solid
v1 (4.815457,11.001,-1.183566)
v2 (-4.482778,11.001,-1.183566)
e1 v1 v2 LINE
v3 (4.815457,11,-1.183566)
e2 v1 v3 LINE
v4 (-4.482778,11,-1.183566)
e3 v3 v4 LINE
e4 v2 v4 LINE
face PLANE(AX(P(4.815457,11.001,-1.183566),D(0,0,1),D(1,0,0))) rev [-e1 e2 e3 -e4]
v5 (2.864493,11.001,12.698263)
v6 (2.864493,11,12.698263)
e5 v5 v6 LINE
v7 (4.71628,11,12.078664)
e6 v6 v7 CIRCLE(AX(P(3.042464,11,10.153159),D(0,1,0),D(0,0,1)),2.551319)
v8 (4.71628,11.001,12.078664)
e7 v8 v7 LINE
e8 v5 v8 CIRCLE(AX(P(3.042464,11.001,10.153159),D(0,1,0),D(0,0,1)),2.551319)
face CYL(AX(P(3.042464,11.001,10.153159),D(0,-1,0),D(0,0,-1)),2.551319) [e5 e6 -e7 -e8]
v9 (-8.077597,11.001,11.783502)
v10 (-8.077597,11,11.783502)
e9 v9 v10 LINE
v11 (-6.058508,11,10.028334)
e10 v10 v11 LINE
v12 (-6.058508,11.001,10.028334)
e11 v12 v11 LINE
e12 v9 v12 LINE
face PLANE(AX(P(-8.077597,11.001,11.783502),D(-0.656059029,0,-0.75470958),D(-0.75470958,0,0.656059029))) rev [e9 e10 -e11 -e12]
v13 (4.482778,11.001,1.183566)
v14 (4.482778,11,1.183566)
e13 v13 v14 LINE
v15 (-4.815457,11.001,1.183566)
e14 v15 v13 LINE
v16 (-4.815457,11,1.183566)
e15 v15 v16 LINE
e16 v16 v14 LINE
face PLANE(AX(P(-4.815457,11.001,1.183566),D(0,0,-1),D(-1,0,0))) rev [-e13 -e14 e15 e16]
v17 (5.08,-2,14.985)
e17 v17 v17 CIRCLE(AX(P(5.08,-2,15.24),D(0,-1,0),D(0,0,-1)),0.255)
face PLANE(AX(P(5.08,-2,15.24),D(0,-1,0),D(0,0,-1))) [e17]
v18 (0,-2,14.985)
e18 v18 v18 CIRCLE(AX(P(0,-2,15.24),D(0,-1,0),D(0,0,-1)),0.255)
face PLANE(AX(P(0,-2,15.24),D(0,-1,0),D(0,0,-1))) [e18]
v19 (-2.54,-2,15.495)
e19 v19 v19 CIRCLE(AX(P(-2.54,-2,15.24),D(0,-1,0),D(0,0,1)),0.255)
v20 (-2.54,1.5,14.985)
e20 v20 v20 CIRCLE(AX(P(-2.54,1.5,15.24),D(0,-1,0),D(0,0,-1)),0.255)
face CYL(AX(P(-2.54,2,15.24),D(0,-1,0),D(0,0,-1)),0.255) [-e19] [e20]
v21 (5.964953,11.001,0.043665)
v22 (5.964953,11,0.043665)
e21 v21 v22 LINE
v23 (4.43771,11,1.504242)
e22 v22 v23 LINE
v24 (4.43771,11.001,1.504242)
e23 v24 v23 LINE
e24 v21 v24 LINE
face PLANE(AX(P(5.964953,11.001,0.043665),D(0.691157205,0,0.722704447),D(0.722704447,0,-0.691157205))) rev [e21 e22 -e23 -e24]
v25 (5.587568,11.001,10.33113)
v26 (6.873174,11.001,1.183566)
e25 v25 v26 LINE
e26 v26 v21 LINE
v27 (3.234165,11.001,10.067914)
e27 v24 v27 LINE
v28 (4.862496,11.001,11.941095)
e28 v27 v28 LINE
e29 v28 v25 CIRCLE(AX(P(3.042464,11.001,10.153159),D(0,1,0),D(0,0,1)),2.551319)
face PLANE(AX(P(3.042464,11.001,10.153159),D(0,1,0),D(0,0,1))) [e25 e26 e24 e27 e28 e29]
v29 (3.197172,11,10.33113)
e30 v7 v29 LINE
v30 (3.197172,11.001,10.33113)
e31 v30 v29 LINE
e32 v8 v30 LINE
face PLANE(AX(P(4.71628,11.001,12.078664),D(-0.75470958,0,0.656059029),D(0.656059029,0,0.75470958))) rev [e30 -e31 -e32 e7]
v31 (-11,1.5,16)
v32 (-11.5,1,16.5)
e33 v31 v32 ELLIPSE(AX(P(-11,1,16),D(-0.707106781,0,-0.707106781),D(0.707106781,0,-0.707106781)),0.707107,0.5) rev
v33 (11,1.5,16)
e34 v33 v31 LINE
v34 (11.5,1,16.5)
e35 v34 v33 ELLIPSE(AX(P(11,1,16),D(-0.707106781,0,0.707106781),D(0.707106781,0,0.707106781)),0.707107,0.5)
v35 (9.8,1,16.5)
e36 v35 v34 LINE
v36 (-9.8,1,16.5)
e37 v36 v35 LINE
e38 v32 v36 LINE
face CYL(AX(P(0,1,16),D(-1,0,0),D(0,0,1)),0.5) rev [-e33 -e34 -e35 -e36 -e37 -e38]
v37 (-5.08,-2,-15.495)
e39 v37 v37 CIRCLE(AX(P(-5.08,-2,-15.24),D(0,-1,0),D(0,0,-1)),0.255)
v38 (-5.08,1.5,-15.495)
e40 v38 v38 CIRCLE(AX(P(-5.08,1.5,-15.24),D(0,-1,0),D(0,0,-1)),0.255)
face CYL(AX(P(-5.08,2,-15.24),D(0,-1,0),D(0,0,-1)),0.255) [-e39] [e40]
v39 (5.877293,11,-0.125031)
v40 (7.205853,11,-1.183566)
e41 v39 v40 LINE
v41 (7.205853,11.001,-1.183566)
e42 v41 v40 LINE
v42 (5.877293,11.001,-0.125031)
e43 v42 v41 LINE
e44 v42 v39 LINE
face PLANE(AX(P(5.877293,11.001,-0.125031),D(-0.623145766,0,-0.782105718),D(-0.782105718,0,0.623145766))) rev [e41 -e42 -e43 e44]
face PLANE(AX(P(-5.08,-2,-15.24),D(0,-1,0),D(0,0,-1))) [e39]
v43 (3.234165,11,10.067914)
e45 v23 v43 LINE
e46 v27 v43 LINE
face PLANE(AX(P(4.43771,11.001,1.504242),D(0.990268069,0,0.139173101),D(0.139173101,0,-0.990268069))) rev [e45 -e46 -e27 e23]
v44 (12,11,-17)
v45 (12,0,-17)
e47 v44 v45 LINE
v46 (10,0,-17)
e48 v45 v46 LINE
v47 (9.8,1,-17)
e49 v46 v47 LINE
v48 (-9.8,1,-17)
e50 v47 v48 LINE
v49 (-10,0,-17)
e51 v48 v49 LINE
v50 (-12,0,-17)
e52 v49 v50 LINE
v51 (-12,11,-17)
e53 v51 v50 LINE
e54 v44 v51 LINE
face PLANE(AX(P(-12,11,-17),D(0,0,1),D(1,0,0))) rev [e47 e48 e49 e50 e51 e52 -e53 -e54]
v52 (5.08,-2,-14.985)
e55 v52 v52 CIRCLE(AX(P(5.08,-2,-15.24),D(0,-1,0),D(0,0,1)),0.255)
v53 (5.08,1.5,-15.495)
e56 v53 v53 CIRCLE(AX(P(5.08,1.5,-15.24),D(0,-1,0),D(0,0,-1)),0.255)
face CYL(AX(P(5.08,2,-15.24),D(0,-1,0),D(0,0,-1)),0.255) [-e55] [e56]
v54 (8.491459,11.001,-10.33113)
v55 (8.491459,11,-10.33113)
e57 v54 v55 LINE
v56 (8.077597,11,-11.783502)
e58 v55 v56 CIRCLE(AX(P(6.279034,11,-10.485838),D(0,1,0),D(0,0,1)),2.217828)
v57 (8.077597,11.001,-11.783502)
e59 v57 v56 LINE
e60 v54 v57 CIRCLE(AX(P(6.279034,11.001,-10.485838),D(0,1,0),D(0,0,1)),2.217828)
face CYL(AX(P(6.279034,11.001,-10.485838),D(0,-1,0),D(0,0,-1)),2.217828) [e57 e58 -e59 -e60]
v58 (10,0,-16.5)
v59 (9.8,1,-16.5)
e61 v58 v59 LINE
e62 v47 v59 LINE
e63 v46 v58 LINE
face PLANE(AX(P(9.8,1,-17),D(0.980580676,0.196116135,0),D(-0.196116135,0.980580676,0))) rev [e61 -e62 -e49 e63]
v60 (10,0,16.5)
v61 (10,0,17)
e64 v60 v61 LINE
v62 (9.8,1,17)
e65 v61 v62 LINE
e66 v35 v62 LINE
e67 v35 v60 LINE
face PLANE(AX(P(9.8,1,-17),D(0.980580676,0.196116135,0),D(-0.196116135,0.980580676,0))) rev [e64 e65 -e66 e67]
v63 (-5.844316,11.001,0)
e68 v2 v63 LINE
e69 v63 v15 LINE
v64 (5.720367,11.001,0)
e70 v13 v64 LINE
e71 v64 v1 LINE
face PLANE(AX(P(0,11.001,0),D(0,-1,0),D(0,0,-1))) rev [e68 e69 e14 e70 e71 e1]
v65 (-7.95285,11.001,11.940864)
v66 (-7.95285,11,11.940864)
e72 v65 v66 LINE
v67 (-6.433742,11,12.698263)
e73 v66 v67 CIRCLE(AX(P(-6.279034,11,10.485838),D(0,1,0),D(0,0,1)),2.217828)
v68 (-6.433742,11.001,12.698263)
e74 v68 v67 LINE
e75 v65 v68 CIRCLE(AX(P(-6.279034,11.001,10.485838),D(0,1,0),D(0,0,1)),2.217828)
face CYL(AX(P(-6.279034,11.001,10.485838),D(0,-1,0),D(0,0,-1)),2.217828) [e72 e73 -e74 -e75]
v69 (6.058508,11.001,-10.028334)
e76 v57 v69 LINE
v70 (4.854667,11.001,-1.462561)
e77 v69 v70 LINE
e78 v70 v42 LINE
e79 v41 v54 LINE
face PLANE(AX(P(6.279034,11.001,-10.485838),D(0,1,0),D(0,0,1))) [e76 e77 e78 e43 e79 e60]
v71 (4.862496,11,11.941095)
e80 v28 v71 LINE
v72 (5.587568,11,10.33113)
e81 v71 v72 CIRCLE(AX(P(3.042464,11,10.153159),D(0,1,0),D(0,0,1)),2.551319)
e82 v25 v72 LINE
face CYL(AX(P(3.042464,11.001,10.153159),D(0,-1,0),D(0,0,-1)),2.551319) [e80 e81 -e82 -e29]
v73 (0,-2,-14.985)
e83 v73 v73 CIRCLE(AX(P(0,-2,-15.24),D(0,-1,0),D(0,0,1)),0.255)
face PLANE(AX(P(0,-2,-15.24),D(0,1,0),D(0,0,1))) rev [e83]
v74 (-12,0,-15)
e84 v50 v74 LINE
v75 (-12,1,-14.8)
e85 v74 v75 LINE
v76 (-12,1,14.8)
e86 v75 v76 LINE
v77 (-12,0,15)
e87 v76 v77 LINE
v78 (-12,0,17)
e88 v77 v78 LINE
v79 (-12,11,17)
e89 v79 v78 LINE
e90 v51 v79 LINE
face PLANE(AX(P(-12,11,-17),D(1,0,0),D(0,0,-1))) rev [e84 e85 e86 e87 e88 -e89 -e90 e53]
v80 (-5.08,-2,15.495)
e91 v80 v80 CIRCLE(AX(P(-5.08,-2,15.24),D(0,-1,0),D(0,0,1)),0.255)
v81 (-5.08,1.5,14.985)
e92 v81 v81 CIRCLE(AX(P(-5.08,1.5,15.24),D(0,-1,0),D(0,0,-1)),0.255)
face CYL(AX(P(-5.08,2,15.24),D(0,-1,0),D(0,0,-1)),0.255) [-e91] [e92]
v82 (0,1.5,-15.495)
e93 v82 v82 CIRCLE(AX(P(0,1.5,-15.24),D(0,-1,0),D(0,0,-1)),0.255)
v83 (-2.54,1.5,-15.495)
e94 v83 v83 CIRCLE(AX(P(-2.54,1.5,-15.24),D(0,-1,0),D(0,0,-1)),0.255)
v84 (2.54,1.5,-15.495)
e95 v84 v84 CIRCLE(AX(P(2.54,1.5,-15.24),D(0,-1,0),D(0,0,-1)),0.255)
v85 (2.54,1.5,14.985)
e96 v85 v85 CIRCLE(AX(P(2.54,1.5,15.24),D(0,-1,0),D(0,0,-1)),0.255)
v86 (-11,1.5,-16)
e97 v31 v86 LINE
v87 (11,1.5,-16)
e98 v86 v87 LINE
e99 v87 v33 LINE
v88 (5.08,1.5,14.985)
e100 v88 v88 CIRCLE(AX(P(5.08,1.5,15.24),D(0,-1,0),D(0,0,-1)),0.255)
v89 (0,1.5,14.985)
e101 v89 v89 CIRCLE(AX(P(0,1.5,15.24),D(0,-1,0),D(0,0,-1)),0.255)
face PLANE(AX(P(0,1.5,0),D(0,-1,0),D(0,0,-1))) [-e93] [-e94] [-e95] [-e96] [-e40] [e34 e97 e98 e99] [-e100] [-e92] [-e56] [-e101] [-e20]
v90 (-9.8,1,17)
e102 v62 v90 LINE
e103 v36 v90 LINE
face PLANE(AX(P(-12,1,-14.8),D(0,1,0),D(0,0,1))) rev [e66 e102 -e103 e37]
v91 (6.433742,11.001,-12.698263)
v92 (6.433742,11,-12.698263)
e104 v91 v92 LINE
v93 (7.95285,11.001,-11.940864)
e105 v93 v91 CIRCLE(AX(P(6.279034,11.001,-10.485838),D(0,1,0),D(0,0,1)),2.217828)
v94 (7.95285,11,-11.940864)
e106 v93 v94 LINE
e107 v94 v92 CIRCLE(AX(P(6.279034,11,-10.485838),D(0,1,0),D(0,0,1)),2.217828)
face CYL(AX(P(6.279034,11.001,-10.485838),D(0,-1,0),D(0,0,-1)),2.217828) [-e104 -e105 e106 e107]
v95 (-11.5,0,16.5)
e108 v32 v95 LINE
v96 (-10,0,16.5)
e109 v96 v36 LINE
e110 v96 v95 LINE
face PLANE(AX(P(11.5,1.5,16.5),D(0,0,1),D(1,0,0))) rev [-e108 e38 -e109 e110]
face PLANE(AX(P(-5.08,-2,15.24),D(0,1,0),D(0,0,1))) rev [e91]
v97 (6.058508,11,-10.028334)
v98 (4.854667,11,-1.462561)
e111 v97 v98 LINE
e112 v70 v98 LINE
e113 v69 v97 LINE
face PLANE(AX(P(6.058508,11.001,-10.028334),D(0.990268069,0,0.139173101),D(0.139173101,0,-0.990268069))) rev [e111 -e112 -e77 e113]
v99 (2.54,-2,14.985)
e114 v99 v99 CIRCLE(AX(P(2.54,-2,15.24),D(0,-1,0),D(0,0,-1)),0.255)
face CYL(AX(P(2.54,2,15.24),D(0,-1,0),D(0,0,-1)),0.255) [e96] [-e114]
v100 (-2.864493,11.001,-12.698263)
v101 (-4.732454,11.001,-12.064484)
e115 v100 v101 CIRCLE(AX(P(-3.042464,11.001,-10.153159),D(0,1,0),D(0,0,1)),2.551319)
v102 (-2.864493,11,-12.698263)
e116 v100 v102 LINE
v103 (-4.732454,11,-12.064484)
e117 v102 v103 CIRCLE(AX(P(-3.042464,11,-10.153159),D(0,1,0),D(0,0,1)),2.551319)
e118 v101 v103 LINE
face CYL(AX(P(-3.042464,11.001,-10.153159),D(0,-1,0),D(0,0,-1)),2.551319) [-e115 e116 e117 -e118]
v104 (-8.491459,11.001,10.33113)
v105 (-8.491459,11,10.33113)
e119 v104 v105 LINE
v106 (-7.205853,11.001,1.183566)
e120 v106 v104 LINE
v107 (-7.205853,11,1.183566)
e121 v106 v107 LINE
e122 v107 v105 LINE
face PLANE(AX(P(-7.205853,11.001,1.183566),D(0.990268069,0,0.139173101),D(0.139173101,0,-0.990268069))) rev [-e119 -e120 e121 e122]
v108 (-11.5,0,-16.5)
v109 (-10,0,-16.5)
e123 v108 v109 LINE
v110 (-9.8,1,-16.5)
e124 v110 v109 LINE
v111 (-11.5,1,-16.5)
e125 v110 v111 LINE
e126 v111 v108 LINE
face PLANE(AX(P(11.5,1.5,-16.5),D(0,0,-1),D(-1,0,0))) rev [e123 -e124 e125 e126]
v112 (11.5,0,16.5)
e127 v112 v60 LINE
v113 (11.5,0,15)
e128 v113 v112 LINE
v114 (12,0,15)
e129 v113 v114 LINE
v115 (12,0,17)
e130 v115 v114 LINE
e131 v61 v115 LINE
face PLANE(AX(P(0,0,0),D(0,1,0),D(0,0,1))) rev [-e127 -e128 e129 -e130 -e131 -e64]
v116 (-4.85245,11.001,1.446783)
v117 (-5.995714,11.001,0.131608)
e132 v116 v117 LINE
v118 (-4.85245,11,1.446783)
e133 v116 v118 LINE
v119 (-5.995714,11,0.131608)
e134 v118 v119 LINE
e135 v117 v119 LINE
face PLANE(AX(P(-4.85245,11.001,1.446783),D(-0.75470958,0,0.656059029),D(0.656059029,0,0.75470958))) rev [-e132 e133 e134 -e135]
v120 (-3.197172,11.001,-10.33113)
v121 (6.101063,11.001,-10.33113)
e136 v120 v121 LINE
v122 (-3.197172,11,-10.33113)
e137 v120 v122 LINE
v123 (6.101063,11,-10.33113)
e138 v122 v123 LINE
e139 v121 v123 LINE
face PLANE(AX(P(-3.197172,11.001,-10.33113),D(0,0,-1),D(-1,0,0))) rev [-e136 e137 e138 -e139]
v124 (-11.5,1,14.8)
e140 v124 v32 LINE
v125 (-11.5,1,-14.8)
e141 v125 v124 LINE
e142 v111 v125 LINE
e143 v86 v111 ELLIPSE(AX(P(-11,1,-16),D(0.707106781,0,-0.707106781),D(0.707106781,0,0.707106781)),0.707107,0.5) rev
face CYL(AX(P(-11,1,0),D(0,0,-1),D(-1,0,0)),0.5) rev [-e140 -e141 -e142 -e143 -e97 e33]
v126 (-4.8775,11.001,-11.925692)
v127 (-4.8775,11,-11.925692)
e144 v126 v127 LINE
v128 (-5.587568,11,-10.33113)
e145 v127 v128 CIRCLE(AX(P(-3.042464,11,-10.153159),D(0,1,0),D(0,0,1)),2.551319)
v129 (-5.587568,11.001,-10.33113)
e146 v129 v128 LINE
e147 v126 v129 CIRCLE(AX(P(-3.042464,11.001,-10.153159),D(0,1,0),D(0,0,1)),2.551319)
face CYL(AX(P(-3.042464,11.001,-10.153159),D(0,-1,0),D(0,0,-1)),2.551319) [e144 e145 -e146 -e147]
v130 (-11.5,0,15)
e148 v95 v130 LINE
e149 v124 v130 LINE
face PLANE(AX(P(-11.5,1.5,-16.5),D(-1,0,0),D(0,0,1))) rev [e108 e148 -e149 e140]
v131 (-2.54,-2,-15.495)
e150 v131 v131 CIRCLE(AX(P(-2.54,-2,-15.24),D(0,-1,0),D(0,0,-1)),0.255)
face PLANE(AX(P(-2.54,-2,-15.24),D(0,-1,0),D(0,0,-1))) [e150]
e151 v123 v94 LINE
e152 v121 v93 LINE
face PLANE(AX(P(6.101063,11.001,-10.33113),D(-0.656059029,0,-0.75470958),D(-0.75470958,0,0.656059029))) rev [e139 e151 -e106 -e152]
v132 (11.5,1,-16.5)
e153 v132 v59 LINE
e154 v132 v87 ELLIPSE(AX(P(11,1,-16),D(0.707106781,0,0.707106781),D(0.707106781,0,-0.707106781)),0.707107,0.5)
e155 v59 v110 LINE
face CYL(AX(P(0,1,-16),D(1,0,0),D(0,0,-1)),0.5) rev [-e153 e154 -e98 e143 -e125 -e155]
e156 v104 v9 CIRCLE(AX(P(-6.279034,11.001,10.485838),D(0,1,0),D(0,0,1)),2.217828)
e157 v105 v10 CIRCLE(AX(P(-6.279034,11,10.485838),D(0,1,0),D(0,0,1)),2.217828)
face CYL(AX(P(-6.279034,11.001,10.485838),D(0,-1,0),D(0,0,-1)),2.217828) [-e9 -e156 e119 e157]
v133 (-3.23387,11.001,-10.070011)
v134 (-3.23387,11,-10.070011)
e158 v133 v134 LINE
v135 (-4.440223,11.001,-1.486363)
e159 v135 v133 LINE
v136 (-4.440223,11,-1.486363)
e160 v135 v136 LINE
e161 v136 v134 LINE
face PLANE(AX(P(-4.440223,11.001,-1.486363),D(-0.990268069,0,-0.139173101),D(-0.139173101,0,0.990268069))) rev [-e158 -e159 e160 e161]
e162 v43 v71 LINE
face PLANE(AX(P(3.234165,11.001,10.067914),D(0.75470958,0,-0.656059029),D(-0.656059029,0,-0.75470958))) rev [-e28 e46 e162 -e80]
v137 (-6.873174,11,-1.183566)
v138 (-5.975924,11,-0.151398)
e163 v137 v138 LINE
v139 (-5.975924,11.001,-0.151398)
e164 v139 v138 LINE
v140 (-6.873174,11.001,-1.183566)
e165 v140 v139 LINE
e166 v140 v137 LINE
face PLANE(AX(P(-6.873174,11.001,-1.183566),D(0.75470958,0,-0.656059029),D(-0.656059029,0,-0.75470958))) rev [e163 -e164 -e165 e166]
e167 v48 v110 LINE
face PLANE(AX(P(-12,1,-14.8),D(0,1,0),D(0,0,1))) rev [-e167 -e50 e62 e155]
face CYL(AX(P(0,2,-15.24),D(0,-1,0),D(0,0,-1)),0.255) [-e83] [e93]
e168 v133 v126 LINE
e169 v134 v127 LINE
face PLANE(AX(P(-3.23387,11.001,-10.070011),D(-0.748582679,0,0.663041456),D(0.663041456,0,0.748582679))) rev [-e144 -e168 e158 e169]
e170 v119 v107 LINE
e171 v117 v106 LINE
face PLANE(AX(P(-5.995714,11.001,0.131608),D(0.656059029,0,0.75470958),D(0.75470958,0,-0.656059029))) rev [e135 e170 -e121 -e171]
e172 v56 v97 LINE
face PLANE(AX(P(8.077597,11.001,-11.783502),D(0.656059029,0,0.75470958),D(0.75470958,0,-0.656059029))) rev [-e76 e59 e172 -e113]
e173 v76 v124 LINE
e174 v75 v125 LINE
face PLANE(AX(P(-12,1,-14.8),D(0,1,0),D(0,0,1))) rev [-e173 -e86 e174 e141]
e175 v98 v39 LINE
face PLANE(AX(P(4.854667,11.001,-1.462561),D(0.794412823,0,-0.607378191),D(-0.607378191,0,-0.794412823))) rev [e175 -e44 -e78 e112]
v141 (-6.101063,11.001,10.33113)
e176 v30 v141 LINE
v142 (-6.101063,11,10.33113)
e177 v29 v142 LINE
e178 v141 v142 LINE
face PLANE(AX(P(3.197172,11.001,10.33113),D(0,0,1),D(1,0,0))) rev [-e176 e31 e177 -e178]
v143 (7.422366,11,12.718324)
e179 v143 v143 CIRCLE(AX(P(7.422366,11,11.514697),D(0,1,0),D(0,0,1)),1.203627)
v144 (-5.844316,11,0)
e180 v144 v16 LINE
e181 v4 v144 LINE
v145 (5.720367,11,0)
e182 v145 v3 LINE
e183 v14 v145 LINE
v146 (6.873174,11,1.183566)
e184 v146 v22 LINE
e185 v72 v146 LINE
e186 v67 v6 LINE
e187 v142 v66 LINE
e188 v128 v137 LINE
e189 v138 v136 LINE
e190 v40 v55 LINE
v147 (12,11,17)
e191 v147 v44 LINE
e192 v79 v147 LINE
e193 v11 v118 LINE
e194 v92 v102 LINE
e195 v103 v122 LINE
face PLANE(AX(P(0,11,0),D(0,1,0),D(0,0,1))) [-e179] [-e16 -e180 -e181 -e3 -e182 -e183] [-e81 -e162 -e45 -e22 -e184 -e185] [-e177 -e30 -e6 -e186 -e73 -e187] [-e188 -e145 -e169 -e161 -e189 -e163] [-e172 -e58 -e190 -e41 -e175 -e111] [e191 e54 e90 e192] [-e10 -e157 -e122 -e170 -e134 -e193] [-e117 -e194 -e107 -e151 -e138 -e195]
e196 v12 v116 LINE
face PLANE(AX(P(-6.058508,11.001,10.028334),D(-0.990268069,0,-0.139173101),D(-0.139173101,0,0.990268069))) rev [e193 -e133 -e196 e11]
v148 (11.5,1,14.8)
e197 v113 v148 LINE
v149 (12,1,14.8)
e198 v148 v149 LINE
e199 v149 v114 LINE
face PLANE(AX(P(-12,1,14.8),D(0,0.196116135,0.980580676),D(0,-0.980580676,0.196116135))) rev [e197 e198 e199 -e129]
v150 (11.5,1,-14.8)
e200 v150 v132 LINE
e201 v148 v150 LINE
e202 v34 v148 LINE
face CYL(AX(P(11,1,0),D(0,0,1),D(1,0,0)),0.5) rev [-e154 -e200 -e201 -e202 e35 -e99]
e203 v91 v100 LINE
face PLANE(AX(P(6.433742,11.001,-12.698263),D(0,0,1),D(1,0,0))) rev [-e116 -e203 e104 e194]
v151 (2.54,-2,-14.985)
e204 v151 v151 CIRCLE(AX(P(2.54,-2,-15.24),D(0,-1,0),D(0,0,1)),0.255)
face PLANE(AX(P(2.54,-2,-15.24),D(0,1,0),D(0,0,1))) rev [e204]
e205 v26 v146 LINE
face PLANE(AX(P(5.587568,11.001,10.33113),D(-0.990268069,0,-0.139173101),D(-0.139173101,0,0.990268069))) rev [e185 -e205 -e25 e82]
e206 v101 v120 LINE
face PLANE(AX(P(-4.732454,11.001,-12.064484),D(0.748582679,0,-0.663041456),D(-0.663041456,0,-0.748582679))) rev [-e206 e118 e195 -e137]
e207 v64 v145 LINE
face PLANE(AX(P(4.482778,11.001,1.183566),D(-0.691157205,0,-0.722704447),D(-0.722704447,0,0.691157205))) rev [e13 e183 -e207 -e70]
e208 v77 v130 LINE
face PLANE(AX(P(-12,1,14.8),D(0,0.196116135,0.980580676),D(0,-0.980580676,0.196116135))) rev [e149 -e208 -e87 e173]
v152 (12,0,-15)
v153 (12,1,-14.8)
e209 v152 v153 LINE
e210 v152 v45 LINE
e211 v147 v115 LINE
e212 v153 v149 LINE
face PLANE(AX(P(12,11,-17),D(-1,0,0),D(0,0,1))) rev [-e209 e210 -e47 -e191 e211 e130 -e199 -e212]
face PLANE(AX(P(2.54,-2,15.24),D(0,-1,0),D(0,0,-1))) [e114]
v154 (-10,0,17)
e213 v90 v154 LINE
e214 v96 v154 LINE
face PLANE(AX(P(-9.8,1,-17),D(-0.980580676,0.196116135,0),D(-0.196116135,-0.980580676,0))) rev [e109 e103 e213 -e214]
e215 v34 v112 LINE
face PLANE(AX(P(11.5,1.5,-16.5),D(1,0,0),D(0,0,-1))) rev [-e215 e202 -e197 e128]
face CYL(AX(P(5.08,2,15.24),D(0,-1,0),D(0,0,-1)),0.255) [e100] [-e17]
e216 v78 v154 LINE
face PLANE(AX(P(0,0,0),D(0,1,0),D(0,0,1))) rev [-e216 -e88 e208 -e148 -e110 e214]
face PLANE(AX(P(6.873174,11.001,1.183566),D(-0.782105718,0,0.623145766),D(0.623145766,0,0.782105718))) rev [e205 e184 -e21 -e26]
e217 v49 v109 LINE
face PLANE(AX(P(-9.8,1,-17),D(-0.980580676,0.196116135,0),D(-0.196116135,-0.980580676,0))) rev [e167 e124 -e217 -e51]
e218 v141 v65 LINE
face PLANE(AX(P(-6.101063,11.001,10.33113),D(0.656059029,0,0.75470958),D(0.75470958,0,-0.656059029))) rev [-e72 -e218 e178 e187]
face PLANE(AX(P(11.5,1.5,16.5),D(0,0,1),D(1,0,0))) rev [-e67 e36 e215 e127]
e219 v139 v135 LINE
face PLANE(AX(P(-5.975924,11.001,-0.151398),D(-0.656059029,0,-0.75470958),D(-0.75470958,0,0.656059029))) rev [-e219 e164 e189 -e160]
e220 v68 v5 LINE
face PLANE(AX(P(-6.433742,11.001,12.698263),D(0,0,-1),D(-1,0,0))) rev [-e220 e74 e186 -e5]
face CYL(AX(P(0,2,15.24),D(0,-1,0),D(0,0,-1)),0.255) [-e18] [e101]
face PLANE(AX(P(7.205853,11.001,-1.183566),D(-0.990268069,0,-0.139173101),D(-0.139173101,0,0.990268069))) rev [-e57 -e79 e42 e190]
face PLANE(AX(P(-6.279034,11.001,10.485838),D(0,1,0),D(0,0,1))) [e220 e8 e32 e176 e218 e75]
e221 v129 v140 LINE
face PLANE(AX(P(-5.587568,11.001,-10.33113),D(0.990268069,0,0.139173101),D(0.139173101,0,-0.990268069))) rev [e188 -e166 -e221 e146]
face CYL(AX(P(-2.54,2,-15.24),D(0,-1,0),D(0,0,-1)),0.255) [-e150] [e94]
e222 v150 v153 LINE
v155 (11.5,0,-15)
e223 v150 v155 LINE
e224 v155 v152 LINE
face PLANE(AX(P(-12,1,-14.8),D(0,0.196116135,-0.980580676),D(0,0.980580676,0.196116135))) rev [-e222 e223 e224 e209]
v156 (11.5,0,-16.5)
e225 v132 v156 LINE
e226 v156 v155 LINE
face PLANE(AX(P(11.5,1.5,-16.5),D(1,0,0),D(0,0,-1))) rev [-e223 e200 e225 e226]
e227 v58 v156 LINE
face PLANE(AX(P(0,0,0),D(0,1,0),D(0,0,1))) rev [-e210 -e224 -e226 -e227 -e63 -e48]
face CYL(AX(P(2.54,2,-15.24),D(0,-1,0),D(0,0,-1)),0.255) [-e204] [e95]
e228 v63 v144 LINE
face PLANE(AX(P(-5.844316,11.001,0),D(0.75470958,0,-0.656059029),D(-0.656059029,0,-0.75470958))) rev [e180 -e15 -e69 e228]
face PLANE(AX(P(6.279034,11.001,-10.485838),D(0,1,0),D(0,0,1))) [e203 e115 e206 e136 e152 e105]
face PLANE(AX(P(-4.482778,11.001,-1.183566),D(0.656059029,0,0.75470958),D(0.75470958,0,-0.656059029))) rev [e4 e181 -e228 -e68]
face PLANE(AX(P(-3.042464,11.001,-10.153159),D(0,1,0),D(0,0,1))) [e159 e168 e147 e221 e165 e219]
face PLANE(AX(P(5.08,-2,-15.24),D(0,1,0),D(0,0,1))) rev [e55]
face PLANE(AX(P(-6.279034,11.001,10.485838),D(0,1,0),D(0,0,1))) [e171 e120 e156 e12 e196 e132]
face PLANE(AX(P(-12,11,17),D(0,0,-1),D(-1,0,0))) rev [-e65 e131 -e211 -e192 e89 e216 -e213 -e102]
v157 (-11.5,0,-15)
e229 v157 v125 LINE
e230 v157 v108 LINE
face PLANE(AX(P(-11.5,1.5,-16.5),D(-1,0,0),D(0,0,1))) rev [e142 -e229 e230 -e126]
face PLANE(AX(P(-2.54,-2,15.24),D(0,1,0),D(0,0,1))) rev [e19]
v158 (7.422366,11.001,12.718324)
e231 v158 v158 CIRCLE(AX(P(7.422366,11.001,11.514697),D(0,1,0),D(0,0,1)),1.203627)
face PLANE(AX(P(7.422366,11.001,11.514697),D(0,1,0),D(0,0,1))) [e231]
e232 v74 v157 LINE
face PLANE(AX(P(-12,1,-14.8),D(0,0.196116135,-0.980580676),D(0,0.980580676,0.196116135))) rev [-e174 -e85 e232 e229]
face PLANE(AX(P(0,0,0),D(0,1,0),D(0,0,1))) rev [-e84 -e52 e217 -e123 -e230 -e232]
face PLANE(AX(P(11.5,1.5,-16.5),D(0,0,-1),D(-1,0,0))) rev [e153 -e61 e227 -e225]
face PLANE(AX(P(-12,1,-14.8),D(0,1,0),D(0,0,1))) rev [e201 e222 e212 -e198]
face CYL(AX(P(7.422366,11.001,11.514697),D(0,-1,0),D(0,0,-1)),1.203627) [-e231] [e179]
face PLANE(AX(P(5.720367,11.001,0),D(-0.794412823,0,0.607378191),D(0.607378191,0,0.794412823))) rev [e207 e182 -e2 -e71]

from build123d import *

# Parameters (mm, degrees)
SKETCH1_W                = 24
SKETCH1_H                = 34
BOSS_EXTRUDE1_DEPTH      = 11
CUT_EXTRUDE1_DEPTH       = 32.400636936
CUT_EXTRUDE2_DEPTH       = 38.69615365
SKETCH5_W                = 23
SKETCH5_H                = 33
CUT_EXTRUDE3_DEPTH       = 1.5
FILLET1_START            = -11.5
FILLET1_DEPTH            = 23
FILLET1_START_2          = -17
FILLET1_2_DEPTH          = 34
BOSS_EXTRUDE3_DEPTH      = 2
BOSS_EXTRUDE3_DEPTH_BACK = 2
SKETCH6_R                = 0.255
SKETCH8_R                = 1.203626853
BOSS_EXTRUDE4_DEPTH      = 0.001


with BuildPart() as part:
    # Sketch1 → Boss-Extrude1 (new body)
    with BuildSketch(Plane(origin=(0, 0, 0), x_dir=(1, 0, 0), z_dir=(0, 1, 0))):
        Rectangle(SKETCH1_W, SKETCH1_H)
    extrude(amount=BOSS_EXTRUDE1_DEPTH)

    # Sketch2 → Cut-Extrude1 (cut, through all)
    with BuildSketch(Plane(origin=(12, 0, 0), x_dir=(0, 0, -1), z_dir=(1, 0, 0))):
        Polygon((14.8, 1), (-14.8, 1), (-15, 0), (-15, -1), (15, -1), (15, 0), align=None)
    extrude(amount=-CUT_EXTRUDE1_DEPTH, mode=Mode.SUBTRACT)

    # Sketch3 → Cut-Extrude2 (cut, through all)
    with BuildSketch(Plane.XY.offset(17)):
        Polygon((9.8, 1), (-9.8, 1), (-10, 0), (-10, -1), (10, -1), (10, 0), align=None)
    extrude(amount=-CUT_EXTRUDE2_DEPTH, mode=Mode.SUBTRACT)

    # Sketch5 → Cut-Extrude3 (cut)
    with BuildSketch(Plane.XZ):
        Rectangle(SKETCH5_W, SKETCH5_H)
    extrude(amount=-CUT_EXTRUDE3_DEPTH, mode=Mode.SUBTRACT)

    # Fillet1: read off the stored shape, not the designer's step
    # Fillet1 outline → Fillet1 (add)
    with BuildSketch(Plane.YZ.offset(FILLET1_START)):
        with BuildLine():
            Line((1.5, 16.5), (1, 16.5))
            ThreePointArc((1, 16.5), (1.353553391, 16.353553391), (1.5, 16))
            Line((1.5, 16), (1.5, 16.5))
        make_face()
        with BuildLine():
            Line((1.5, -16.5), (1.5, -16))
            ThreePointArc((1.5, -16), (1.353553391, -16.353553391), (1, -16.5))
            Line((1, -16.5), (1.5, -16.5))
        make_face()
    extrude(amount=FILLET1_DEPTH)

    # Fillet1 2 outline → Fillet1 2 (add)
    with BuildSketch(Plane.XY.offset(FILLET1_START_2)):
        with BuildLine():
            Line((-11.5, 1.5), (-11.5, 1))
            ThreePointArc((-11.5, 1), (-11.353553391, 1.353553391), (-11, 1.5))
            Line((-11, 1.5), (-11.5, 1.5))
        make_face()
        with BuildLine():
            Line((11.5, 1.5), (11, 1.5))
            ThreePointArc((11, 1.5), (11.353553391, 1.353553391), (11.5, 1))
            Line((11.5, 1), (11.5, 1.5))
        make_face()
    extrude(amount=FILLET1_2_DEPTH)

    # Sketch6 → Boss-Extrude3 (add, two sides: drawn at the far end of the back side and taken through both)
    with BuildSketch(Plane.XZ.offset(-BOSS_EXTRUDE3_DEPTH_BACK)):
        with Locations(Location((0, 15.24, 0), (0, 0, 270))):
            Circle(SKETCH6_R)
        with Locations(Location((2.54, 15.24, 0), (0, 0, 270))):
            Circle(SKETCH6_R)
        with Locations(Location((5.08, 15.24, 0), (0, 0, 270))):
            Circle(SKETCH6_R)
        with Locations(Location((-5.08, 15.24, 0), (0, 0, 270))):
            Circle(SKETCH6_R)
        with Locations(Location((-2.54, 15.24, 0), (0, 0, 270))):
            Circle(SKETCH6_R)
        with Locations(Location((-2.54, -15.24, 0), (0, 0, 270))):
            Circle(SKETCH6_R)
        with Locations(Location((-5.08, -15.24, 0), (0, 0, 270))):
            Circle(SKETCH6_R)
        with Locations(Location((5.08, -15.24, 0), (0, 0, 270))):
            Circle(SKETCH6_R)
        with Locations(Location((2.54, -15.24, 0), (0, 0, 270))):
            Circle(SKETCH6_R)
        with Locations(Location((0, -15.24, 0), (0, 0, 270))):
            Circle(SKETCH6_R)
    extrude(amount=BOSS_EXTRUDE3_DEPTH + BOSS_EXTRUDE3_DEPTH_BACK)

    # Sketch8 → Boss-Extrude4 (add)
    with BuildSketch(Plane(origin=(0, 11, 0), x_dir=(1, 0, 0), z_dir=(0, 1, 0))):
        with Locations(Location((7.422365596, -11.514696897, 0), (0, 0, 270))):
            Circle(SKETCH8_R)
        with BuildLine():
            Line((4.437710207, -1.50424181), (3.234164607, -10.067913736))
            Line((3.234164607, -10.067913736), (4.862495803, -11.941094501))
            ThreePointArc((4.862495803, -11.941094501), (5.368748257, -11.200837396), (5.587567885, -10.331130491))
            Line((5.587567885, -10.331130491), (6.873174177, -1.183566406))
            Line((6.873174177, -1.183566406), (5.964953485, -0.043665222))
            Line((5.964953485, -0.043665222), (4.437710207, -1.50424181))
        make_face()
        with BuildLine():
            Line((5.877292712, 0.125030841), (7.205852999, 1.183566406))
            Line((7.205852999, 1.183566406), (8.491459291, 10.331130491))
            ThreePointArc((8.491459291, 10.331130491), (8.411955198, 11.093627172), (8.077597236, 11.783501683))
            Line((8.077597236, 11.783501683), (6.058508073, 10.028334252))
            Line((6.058508073, 10.028334252), (4.854667192, 1.462561294))
            Line((4.854667192, 1.462561294), (5.877292712, 0.125030841))
        make_face()
        with BuildLine():
            Line((6.10106331, 10.331130491), (7.952849968, 11.940864075))
            ThreePointArc((7.952849968, 11.940864075), (7.268624086, 12.470648357), (6.433742131, 12.698263303))
            Line((6.433742131, 12.698263303), (-2.864493083, 12.698263303))
            ThreePointArc((-2.864493083, 12.698263303), (-3.862201278, 12.569201297), (-4.732453708, 12.064484197))
            Line((-4.732453708, 12.064484197), (-3.197171904, 10.331130491))
            Line((-3.197171904, 10.331130491), (6.10106331, 10.331130491))
        make_face()
        Polygon((-4.815457018, -1.183566406), (4.482778196, -1.183566406), (5.720367413, 0), (4.815457018, 1.183566406), (-4.482778196, 1.183566406), (-5.844315597, 0), align=None)
        with BuildLine():
            Line((-5.975923975, 0.15139812), (-4.44022296, 1.486362645))
            Line((-4.44022296, 1.486362645), (-3.233869851, 10.07001103))
            Line((-3.233869851, 10.07001103), (-4.877500084, 11.925691561))
            ThreePointArc((-4.877500084, 11.925691561), (-5.373142616, 11.19102491), (-5.587567885, 10.331130491))
            Line((-5.587567885, 10.331130491), (-6.873174177, 1.183566406))
            Line((-6.873174177, 1.183566406), (-5.975923975, 0.15139812))
        make_face()
        with BuildLine():
            Line((-5.995713717, -0.131608377), (-7.205852999, -1.183566406))
            Line((-7.205852999, -1.183566406), (-8.491459291, -10.331130491))
            ThreePointArc((-8.491459291, -10.331130491), (-8.411955198, -11.093627172), (-8.077597236, -11.783501683))
            Line((-8.077597236, -11.783501683), (-6.058508073, -10.028334252))
            Line((-6.058508073, -10.028334252), (-4.85244972, -1.446783161))
            Line((-4.85244972, -1.446783161), (-5.995713717, -0.131608377))
        make_face()
        with BuildLine():
            Line((-6.10106331, -10.331130491), (-7.952849968, -11.940864075))
            ThreePointArc((-7.952849968, -11.940864075), (-7.268624086, -12.470648357), (-6.433742131, -12.698263303))
            Line((-6.433742131, -12.698263303), (2.864493083, -12.698263303))
            ThreePointArc((2.864493083, -12.698263303), (3.852009379, -12.572635363), (4.716279741, -12.078664154))
            Line((4.716279741, -12.078664154), (3.197171904, -10.331130491))
            Line((3.197171904, -10.331130491), (-6.10106331, -10.331130491))
        make_face()
    extrude(amount=BOSS_EXTRUDE4_DEPTH)


solid = part.part
